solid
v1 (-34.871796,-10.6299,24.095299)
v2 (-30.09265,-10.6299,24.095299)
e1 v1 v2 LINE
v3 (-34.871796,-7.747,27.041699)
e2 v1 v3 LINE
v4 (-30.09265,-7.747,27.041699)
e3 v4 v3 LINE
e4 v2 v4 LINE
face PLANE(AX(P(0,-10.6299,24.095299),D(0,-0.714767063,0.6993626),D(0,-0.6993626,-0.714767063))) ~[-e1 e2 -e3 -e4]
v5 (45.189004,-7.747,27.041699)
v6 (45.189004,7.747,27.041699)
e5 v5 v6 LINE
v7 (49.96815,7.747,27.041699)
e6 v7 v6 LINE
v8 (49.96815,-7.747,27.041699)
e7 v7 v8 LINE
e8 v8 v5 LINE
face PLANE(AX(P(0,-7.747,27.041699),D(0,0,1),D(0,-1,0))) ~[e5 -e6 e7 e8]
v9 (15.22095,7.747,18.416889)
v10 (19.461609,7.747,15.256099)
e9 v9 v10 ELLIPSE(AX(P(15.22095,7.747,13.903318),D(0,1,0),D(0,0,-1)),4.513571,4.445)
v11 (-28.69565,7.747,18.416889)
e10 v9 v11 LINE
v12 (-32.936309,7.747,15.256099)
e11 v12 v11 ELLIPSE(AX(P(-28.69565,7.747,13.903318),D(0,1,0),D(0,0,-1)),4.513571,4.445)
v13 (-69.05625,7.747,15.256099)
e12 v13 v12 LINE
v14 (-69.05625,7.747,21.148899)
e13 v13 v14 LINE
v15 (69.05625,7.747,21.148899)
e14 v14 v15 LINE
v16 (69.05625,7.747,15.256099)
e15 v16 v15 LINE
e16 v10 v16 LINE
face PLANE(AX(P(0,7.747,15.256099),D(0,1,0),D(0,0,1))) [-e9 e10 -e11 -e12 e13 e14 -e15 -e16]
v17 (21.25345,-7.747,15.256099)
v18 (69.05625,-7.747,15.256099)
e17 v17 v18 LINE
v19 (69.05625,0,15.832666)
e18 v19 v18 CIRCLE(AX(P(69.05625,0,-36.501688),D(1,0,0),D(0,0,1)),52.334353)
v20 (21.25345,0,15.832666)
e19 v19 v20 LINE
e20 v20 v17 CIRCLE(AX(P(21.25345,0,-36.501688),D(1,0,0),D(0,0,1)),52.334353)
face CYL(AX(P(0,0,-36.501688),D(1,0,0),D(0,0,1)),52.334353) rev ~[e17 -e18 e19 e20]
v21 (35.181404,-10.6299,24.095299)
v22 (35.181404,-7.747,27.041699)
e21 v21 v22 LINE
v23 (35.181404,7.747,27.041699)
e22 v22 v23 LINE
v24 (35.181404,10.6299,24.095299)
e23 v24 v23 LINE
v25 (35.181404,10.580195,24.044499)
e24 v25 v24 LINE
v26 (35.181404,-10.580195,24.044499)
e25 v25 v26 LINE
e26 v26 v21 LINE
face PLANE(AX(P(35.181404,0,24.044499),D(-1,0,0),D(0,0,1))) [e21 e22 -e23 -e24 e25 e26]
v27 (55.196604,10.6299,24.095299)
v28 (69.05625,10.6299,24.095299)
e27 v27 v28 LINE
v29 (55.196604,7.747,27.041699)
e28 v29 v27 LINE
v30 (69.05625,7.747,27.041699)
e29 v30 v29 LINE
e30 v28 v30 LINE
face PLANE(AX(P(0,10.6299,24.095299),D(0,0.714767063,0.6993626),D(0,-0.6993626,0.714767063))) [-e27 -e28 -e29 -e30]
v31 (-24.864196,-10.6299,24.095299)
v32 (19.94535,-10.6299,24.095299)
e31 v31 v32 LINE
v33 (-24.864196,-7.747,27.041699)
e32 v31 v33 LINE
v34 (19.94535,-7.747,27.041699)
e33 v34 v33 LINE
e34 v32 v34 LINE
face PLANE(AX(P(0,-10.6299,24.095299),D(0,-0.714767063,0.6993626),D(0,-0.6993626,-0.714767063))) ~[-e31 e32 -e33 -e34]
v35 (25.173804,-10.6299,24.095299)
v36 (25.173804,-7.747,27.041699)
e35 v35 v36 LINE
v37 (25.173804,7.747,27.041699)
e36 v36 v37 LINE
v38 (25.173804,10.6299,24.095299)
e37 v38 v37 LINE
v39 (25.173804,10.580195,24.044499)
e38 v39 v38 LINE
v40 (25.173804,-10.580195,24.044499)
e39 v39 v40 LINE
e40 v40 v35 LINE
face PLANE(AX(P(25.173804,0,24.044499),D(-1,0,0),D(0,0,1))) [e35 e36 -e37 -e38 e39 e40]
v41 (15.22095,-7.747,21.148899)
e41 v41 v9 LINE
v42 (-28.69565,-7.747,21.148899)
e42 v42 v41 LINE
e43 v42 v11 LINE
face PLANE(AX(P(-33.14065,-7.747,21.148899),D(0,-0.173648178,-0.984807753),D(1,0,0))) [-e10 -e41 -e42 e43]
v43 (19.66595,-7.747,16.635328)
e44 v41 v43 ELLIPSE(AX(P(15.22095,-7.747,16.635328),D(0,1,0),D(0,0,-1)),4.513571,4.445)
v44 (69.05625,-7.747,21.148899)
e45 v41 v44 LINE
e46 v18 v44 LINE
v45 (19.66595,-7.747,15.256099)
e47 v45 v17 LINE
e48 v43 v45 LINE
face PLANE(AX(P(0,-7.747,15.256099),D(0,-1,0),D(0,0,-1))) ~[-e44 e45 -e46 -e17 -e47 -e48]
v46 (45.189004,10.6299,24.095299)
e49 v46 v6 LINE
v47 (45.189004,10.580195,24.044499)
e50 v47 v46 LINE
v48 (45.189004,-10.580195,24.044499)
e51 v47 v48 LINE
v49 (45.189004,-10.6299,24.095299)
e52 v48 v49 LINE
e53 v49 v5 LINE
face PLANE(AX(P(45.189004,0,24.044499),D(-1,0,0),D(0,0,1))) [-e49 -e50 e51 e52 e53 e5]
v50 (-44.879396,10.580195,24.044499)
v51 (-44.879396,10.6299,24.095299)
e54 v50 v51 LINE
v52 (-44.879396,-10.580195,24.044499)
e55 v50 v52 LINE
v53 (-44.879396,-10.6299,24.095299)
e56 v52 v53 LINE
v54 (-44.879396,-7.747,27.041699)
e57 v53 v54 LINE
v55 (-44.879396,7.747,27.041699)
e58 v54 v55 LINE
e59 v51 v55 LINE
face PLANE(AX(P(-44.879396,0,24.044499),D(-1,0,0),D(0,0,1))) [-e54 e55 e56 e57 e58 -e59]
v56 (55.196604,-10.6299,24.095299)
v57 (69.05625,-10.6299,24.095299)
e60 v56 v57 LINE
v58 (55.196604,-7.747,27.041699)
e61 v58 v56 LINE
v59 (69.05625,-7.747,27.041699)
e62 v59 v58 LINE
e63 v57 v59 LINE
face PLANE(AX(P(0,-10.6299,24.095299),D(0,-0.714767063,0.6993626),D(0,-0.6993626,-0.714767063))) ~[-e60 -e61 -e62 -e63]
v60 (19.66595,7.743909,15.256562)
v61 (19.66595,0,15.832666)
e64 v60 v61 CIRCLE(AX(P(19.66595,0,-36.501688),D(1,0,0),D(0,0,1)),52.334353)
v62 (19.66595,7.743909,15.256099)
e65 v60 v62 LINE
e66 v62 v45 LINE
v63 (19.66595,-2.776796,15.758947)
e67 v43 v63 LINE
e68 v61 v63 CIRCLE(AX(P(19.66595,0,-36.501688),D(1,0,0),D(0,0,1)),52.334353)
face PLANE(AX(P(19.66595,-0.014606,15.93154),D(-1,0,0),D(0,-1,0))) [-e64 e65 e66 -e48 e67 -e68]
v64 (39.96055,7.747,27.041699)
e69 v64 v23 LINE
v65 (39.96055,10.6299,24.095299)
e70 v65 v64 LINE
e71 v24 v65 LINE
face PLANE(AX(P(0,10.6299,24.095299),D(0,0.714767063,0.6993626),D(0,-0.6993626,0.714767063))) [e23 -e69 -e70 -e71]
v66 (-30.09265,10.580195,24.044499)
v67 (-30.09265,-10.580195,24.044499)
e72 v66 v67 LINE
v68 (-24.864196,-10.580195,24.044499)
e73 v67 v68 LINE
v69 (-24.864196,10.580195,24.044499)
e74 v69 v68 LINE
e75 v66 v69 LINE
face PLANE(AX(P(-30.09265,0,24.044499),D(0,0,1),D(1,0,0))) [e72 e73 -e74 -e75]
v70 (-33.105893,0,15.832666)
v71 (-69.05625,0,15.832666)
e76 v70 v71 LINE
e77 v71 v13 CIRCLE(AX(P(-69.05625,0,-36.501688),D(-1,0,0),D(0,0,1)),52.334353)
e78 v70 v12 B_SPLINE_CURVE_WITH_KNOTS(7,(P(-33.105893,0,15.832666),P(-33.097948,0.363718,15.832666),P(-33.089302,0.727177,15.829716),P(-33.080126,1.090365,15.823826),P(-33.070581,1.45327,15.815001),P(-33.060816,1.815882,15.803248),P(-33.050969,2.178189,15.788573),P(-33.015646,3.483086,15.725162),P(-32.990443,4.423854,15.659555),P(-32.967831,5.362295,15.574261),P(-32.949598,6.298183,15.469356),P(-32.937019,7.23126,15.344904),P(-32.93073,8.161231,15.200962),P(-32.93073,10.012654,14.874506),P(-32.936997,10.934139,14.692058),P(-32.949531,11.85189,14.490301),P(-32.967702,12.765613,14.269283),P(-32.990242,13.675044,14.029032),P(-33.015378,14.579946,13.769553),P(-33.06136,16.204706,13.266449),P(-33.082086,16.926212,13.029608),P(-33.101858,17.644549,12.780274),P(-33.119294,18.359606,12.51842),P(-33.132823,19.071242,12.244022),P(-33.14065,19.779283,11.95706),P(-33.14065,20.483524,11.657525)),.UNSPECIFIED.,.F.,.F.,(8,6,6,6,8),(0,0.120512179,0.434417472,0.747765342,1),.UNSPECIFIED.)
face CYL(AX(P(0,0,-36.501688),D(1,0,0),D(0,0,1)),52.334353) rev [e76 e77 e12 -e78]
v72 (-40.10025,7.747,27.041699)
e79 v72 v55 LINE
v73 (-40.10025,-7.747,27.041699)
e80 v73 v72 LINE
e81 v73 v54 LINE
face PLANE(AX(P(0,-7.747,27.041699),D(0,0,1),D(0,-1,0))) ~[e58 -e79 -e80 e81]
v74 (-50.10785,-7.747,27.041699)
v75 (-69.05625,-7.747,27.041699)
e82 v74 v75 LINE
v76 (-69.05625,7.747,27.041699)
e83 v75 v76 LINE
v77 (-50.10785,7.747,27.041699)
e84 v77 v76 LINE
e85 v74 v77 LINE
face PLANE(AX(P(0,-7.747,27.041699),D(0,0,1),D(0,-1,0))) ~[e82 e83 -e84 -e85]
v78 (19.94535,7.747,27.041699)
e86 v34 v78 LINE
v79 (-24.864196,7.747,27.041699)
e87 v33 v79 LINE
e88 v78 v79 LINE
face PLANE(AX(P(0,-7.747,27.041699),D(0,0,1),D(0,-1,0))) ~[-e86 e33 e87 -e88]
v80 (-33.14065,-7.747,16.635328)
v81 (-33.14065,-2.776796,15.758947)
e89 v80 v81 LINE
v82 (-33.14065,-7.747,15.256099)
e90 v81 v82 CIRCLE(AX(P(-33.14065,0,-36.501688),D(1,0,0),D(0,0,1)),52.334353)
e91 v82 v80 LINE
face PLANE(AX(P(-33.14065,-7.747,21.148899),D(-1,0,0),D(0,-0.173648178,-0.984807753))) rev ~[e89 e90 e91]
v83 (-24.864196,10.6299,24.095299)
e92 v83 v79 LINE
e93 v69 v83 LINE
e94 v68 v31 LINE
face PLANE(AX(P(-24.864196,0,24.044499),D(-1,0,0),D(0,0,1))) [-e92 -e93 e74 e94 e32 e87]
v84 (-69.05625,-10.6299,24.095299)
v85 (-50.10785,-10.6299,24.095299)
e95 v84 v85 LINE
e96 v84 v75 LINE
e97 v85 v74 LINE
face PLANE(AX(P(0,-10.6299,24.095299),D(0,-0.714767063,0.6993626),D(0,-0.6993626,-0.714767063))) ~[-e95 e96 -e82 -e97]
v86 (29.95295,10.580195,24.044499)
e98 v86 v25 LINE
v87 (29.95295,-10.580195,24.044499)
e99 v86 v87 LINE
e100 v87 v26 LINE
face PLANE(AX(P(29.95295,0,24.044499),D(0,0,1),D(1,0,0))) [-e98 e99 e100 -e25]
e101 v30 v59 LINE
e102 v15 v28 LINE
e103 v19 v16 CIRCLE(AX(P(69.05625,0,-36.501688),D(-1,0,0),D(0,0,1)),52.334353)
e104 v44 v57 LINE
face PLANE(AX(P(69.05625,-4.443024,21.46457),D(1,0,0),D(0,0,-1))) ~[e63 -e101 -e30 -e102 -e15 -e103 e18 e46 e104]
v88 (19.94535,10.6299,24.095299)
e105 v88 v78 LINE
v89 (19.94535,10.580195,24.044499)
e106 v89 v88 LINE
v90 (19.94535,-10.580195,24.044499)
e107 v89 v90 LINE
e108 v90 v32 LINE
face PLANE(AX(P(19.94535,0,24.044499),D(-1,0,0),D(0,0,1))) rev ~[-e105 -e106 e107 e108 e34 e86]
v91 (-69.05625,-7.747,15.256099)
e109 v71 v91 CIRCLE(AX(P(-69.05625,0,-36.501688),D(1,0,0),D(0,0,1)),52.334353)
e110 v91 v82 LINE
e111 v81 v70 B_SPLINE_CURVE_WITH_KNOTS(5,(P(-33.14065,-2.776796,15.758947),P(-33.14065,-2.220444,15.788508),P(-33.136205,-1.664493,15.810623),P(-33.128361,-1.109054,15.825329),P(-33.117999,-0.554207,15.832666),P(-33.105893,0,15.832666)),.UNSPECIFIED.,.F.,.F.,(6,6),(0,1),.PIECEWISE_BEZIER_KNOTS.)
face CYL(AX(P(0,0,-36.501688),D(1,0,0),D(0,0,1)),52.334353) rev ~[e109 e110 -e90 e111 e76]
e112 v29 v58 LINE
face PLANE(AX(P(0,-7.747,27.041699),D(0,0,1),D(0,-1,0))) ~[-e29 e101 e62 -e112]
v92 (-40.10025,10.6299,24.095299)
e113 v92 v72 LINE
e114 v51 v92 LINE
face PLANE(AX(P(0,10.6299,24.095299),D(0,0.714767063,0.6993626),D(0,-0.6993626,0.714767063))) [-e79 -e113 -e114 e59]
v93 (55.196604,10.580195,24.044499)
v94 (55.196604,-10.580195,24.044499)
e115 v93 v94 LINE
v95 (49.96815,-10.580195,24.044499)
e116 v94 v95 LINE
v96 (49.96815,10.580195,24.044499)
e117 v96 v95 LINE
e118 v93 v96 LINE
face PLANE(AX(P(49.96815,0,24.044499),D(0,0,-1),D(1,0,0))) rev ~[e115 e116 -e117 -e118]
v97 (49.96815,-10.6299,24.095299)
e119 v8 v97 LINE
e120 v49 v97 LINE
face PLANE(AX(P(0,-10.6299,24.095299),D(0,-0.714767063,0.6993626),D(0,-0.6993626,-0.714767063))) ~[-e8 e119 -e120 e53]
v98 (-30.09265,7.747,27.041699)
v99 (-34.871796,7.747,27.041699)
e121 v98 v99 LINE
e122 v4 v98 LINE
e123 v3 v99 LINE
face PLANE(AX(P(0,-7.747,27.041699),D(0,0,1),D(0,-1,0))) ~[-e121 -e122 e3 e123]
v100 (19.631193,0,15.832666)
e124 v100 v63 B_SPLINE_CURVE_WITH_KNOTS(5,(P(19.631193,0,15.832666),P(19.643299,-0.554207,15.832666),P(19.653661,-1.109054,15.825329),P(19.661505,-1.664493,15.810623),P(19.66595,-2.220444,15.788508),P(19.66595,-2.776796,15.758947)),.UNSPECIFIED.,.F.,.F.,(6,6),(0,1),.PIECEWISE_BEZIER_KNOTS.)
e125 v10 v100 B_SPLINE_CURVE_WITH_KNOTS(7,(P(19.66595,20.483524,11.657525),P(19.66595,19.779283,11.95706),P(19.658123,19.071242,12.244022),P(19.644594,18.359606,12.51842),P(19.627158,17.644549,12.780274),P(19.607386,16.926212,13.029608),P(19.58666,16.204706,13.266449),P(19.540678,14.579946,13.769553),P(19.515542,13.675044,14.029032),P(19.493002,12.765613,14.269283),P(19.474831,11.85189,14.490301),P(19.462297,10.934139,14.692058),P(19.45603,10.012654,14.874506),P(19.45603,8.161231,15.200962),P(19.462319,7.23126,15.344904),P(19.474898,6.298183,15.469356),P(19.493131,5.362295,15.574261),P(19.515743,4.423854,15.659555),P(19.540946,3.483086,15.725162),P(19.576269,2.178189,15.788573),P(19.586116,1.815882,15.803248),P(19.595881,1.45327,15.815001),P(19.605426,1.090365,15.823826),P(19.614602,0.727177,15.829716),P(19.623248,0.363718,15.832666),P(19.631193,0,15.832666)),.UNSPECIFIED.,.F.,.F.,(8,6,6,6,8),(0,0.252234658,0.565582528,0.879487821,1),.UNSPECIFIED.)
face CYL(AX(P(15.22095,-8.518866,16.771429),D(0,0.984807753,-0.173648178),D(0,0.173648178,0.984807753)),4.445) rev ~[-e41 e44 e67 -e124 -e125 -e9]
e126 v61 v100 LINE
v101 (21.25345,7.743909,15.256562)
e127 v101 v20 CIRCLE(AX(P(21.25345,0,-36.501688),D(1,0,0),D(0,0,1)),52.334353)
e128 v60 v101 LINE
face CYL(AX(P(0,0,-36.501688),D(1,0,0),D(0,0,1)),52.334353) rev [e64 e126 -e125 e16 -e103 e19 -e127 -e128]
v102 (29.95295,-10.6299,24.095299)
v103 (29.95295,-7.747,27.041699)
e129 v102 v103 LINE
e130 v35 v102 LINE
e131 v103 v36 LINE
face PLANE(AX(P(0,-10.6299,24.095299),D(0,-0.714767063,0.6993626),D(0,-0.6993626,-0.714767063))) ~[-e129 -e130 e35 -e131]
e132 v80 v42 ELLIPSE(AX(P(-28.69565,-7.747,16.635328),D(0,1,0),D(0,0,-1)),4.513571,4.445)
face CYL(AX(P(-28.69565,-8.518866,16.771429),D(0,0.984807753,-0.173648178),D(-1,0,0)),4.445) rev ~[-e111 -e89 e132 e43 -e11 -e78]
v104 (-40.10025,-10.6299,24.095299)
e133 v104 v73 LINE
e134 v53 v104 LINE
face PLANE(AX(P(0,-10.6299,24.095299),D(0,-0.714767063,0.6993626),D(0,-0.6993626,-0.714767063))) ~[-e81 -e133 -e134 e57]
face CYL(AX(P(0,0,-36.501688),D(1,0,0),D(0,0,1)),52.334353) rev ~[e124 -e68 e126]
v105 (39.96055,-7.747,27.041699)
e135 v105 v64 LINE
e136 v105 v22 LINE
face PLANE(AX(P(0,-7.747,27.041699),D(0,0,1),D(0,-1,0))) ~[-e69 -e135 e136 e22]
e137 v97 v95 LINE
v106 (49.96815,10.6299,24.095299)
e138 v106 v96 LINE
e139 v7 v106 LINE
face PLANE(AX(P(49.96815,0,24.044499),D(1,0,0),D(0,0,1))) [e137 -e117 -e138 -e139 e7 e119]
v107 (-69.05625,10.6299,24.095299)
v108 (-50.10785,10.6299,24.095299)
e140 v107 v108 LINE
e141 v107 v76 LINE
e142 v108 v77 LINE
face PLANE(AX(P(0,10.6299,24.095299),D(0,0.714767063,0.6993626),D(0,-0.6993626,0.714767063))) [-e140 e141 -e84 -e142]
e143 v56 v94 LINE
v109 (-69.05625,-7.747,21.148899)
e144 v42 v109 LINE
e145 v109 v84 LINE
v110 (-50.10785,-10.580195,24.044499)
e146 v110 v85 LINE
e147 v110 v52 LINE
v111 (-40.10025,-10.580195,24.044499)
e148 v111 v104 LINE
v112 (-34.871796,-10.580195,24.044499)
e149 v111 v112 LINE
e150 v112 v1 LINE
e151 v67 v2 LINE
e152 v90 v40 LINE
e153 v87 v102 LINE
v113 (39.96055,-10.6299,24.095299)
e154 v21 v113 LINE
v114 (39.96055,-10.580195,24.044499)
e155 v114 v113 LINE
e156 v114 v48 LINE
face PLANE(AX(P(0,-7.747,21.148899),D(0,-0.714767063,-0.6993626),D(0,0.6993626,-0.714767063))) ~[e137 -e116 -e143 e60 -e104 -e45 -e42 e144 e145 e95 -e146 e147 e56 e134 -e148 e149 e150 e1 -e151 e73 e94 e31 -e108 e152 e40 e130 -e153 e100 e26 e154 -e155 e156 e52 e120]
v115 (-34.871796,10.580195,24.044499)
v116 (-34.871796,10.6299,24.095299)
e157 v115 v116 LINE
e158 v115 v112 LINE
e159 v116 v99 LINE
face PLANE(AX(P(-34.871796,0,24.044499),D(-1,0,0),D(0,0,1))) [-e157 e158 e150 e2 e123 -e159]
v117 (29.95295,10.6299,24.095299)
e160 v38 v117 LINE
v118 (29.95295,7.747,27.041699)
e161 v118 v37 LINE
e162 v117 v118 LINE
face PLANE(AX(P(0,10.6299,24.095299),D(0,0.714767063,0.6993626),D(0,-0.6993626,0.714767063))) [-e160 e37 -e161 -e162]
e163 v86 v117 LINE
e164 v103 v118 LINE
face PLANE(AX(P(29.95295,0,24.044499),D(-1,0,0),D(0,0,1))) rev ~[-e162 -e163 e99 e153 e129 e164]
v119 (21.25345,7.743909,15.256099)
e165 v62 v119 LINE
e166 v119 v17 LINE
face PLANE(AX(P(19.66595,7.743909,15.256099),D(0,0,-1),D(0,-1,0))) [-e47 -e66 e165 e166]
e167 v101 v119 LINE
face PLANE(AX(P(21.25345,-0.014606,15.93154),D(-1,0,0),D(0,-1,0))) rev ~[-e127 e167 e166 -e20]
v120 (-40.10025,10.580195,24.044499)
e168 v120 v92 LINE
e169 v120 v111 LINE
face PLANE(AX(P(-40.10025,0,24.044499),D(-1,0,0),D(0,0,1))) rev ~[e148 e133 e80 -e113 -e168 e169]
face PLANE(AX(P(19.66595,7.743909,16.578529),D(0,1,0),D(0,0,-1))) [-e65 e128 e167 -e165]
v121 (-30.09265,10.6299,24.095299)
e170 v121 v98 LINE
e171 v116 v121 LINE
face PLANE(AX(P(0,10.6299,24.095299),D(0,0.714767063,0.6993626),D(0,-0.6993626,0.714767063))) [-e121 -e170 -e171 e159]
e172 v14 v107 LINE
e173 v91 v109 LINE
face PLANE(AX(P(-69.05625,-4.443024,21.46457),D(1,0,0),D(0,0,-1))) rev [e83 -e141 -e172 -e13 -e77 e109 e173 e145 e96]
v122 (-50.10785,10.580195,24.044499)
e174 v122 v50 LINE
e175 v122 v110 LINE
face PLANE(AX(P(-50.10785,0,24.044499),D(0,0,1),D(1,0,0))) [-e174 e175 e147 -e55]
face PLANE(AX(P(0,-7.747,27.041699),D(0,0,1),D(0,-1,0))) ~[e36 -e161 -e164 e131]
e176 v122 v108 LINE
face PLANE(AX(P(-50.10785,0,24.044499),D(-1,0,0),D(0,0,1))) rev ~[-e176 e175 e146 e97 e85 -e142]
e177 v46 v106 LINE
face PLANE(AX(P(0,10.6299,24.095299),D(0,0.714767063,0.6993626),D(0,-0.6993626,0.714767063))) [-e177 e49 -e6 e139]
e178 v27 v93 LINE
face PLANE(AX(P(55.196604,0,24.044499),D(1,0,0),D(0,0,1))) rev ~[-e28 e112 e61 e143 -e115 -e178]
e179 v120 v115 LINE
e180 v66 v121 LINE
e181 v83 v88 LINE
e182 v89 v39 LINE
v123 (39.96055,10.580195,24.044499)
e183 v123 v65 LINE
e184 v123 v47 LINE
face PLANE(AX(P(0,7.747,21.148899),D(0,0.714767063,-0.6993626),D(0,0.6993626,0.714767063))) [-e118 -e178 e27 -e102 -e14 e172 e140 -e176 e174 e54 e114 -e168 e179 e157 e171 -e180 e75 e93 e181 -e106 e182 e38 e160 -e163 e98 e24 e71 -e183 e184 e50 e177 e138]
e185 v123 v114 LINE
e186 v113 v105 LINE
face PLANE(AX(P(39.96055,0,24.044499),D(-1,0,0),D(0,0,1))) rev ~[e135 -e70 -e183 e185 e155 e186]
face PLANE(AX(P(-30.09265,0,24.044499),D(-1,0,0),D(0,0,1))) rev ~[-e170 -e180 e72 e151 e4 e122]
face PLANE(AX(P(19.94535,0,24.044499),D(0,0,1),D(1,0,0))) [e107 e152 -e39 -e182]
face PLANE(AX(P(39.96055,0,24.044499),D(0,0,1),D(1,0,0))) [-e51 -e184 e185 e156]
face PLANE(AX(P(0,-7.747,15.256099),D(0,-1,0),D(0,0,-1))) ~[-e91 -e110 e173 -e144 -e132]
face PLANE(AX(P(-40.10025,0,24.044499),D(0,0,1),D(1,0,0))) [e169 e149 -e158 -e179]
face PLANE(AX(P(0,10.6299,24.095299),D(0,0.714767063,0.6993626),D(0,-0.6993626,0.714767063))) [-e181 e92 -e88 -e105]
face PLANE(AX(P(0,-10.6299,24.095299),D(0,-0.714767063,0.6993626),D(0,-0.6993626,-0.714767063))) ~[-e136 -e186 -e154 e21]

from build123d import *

# Parameters (mm, degrees)
F1_DEPTH  = 69.05625
F4_ANGLE  = 90
F5_W      = 5.2284544853
F5_H      = 7.121348225
F6_DEPTH  = 12.7
F7_W      = 52.8066
F7_H      = 18.3185085185
F7_H_2    = 5.8928
F9_DEPTH  = 25.4
F10_ANGLE = 350
F12_R     = 4.445
F14_DEPTH = 1.5875


# Not quite as in the source:
# - a feature names something its author has since deleted; it is built from what else it names


with BuildPart() as f1:
    # F0 (on Right) → F1 (new body, symmetric)
    with BuildSketch(Plane.YZ):
        with BuildLine():
            ThreePointArc((15.8326655208, 0), (15.688324924, -3.8842128409), (15.2560993298, -7.747))
            Line((15.2560993298, -7.747), (21.1488993298, -7.747))
            Line((21.1488993298, -7.747), (24.0952993298, -10.6299))
            Line((24.0952993298, -10.6299), (27.0416993298, -7.747))
            Line((27.0416993298, -7.747), (27.0416993298, 0))
            Line((27.0416993298, 0), (15.8326655208, 0))
        make_face()
    extrude(amount=F1_DEPTH, both=True)

    # F2: F1 across plane


with BuildPart() as f1_1:
    add(f1.part)
    add(f1.part.mirror(Plane.XY))


with BuildPart() as f1_2:
    # F4: moved
    add(f1_1.part.rotate(Axis((39.1787812114, 0, 0), (1, 0, 0)), F4_ANGLE))

    # F5 (on Front) → F6 (cut, symmetric)
    with BuildSketch(Plane.XZ):
        with Locations((-47.4936227574, 27.6051734423)):
            Rectangle(F5_W, F5_H)
        with Locations((-37.4860227574, 27.6051734423)):
            Rectangle(F5_W, F5_H)
        with Locations((-27.4784227574, 27.6051734423)):
            Rectangle(F5_W, F5_H)
        with Locations((22.5595772426, 27.6051734423)):
            Rectangle(F5_W, F5_H)
        with Locations((32.5671772426, 27.6051734423)):
            Rectangle(F5_W, F5_H)
        with Locations((42.5747772426, 27.6051734423)):
            Rectangle(F5_W, F5_H)
        with Locations((52.5823772426, 27.6051734423)):
            Rectangle(F5_W, F5_H)
    extrude(amount=F6_DEPTH, both=True, mode=Mode.SUBTRACT)


with BuildPart() as f9:
    # F7 (on face) → F9 (new body)
    with BuildSketch(Plane.XZ.offset(7.747)):
        with Locations((-6.73735, 6.0968450705)):
            Rectangle(F7_W, F7_H)
        with Locations((-6.73735, 18.2024993298)):
            Rectangle(F7_W, F7_H_2)
    extrude(amount=-F9_DEPTH)


with BuildPart() as f9_1:
    # F10: moved
    add(f9.part.rotate(Axis((-6.73735, -7.747, 21.1488993298), (1, 0, 0)), F10_ANGLE))


with BuildPart() as f1_3:
    add(f1_2.part)

    # F11: cut F9
    add(f9_1.part, mode=Mode.SUBTRACT)

    # F12
    f12_edges = [f1_3.edges().sort_by_distance(p)[0] for p in [
        (-33.14065, 0, 19.782894),
        (19.66595, 0, 19.782894),
    ]]
    fillet(f12_edges, radius=F12_R)

    # F13 (on face) → F14 (join)
    with BuildSketch(Plane(origin=(19.66595, 0, 0), x_dir=(0, -1, 0), z_dir=(-1, 0, 0))):
        Polygon((-7.7439094894, 15.2560993298), (7.747, 15.2560993298), (7.747, 16.6353280399), (-7.7439094894, 16.5785290301), align=None)
    extrude(amount=-F14_DEPTH)


solid = f1_3.part
